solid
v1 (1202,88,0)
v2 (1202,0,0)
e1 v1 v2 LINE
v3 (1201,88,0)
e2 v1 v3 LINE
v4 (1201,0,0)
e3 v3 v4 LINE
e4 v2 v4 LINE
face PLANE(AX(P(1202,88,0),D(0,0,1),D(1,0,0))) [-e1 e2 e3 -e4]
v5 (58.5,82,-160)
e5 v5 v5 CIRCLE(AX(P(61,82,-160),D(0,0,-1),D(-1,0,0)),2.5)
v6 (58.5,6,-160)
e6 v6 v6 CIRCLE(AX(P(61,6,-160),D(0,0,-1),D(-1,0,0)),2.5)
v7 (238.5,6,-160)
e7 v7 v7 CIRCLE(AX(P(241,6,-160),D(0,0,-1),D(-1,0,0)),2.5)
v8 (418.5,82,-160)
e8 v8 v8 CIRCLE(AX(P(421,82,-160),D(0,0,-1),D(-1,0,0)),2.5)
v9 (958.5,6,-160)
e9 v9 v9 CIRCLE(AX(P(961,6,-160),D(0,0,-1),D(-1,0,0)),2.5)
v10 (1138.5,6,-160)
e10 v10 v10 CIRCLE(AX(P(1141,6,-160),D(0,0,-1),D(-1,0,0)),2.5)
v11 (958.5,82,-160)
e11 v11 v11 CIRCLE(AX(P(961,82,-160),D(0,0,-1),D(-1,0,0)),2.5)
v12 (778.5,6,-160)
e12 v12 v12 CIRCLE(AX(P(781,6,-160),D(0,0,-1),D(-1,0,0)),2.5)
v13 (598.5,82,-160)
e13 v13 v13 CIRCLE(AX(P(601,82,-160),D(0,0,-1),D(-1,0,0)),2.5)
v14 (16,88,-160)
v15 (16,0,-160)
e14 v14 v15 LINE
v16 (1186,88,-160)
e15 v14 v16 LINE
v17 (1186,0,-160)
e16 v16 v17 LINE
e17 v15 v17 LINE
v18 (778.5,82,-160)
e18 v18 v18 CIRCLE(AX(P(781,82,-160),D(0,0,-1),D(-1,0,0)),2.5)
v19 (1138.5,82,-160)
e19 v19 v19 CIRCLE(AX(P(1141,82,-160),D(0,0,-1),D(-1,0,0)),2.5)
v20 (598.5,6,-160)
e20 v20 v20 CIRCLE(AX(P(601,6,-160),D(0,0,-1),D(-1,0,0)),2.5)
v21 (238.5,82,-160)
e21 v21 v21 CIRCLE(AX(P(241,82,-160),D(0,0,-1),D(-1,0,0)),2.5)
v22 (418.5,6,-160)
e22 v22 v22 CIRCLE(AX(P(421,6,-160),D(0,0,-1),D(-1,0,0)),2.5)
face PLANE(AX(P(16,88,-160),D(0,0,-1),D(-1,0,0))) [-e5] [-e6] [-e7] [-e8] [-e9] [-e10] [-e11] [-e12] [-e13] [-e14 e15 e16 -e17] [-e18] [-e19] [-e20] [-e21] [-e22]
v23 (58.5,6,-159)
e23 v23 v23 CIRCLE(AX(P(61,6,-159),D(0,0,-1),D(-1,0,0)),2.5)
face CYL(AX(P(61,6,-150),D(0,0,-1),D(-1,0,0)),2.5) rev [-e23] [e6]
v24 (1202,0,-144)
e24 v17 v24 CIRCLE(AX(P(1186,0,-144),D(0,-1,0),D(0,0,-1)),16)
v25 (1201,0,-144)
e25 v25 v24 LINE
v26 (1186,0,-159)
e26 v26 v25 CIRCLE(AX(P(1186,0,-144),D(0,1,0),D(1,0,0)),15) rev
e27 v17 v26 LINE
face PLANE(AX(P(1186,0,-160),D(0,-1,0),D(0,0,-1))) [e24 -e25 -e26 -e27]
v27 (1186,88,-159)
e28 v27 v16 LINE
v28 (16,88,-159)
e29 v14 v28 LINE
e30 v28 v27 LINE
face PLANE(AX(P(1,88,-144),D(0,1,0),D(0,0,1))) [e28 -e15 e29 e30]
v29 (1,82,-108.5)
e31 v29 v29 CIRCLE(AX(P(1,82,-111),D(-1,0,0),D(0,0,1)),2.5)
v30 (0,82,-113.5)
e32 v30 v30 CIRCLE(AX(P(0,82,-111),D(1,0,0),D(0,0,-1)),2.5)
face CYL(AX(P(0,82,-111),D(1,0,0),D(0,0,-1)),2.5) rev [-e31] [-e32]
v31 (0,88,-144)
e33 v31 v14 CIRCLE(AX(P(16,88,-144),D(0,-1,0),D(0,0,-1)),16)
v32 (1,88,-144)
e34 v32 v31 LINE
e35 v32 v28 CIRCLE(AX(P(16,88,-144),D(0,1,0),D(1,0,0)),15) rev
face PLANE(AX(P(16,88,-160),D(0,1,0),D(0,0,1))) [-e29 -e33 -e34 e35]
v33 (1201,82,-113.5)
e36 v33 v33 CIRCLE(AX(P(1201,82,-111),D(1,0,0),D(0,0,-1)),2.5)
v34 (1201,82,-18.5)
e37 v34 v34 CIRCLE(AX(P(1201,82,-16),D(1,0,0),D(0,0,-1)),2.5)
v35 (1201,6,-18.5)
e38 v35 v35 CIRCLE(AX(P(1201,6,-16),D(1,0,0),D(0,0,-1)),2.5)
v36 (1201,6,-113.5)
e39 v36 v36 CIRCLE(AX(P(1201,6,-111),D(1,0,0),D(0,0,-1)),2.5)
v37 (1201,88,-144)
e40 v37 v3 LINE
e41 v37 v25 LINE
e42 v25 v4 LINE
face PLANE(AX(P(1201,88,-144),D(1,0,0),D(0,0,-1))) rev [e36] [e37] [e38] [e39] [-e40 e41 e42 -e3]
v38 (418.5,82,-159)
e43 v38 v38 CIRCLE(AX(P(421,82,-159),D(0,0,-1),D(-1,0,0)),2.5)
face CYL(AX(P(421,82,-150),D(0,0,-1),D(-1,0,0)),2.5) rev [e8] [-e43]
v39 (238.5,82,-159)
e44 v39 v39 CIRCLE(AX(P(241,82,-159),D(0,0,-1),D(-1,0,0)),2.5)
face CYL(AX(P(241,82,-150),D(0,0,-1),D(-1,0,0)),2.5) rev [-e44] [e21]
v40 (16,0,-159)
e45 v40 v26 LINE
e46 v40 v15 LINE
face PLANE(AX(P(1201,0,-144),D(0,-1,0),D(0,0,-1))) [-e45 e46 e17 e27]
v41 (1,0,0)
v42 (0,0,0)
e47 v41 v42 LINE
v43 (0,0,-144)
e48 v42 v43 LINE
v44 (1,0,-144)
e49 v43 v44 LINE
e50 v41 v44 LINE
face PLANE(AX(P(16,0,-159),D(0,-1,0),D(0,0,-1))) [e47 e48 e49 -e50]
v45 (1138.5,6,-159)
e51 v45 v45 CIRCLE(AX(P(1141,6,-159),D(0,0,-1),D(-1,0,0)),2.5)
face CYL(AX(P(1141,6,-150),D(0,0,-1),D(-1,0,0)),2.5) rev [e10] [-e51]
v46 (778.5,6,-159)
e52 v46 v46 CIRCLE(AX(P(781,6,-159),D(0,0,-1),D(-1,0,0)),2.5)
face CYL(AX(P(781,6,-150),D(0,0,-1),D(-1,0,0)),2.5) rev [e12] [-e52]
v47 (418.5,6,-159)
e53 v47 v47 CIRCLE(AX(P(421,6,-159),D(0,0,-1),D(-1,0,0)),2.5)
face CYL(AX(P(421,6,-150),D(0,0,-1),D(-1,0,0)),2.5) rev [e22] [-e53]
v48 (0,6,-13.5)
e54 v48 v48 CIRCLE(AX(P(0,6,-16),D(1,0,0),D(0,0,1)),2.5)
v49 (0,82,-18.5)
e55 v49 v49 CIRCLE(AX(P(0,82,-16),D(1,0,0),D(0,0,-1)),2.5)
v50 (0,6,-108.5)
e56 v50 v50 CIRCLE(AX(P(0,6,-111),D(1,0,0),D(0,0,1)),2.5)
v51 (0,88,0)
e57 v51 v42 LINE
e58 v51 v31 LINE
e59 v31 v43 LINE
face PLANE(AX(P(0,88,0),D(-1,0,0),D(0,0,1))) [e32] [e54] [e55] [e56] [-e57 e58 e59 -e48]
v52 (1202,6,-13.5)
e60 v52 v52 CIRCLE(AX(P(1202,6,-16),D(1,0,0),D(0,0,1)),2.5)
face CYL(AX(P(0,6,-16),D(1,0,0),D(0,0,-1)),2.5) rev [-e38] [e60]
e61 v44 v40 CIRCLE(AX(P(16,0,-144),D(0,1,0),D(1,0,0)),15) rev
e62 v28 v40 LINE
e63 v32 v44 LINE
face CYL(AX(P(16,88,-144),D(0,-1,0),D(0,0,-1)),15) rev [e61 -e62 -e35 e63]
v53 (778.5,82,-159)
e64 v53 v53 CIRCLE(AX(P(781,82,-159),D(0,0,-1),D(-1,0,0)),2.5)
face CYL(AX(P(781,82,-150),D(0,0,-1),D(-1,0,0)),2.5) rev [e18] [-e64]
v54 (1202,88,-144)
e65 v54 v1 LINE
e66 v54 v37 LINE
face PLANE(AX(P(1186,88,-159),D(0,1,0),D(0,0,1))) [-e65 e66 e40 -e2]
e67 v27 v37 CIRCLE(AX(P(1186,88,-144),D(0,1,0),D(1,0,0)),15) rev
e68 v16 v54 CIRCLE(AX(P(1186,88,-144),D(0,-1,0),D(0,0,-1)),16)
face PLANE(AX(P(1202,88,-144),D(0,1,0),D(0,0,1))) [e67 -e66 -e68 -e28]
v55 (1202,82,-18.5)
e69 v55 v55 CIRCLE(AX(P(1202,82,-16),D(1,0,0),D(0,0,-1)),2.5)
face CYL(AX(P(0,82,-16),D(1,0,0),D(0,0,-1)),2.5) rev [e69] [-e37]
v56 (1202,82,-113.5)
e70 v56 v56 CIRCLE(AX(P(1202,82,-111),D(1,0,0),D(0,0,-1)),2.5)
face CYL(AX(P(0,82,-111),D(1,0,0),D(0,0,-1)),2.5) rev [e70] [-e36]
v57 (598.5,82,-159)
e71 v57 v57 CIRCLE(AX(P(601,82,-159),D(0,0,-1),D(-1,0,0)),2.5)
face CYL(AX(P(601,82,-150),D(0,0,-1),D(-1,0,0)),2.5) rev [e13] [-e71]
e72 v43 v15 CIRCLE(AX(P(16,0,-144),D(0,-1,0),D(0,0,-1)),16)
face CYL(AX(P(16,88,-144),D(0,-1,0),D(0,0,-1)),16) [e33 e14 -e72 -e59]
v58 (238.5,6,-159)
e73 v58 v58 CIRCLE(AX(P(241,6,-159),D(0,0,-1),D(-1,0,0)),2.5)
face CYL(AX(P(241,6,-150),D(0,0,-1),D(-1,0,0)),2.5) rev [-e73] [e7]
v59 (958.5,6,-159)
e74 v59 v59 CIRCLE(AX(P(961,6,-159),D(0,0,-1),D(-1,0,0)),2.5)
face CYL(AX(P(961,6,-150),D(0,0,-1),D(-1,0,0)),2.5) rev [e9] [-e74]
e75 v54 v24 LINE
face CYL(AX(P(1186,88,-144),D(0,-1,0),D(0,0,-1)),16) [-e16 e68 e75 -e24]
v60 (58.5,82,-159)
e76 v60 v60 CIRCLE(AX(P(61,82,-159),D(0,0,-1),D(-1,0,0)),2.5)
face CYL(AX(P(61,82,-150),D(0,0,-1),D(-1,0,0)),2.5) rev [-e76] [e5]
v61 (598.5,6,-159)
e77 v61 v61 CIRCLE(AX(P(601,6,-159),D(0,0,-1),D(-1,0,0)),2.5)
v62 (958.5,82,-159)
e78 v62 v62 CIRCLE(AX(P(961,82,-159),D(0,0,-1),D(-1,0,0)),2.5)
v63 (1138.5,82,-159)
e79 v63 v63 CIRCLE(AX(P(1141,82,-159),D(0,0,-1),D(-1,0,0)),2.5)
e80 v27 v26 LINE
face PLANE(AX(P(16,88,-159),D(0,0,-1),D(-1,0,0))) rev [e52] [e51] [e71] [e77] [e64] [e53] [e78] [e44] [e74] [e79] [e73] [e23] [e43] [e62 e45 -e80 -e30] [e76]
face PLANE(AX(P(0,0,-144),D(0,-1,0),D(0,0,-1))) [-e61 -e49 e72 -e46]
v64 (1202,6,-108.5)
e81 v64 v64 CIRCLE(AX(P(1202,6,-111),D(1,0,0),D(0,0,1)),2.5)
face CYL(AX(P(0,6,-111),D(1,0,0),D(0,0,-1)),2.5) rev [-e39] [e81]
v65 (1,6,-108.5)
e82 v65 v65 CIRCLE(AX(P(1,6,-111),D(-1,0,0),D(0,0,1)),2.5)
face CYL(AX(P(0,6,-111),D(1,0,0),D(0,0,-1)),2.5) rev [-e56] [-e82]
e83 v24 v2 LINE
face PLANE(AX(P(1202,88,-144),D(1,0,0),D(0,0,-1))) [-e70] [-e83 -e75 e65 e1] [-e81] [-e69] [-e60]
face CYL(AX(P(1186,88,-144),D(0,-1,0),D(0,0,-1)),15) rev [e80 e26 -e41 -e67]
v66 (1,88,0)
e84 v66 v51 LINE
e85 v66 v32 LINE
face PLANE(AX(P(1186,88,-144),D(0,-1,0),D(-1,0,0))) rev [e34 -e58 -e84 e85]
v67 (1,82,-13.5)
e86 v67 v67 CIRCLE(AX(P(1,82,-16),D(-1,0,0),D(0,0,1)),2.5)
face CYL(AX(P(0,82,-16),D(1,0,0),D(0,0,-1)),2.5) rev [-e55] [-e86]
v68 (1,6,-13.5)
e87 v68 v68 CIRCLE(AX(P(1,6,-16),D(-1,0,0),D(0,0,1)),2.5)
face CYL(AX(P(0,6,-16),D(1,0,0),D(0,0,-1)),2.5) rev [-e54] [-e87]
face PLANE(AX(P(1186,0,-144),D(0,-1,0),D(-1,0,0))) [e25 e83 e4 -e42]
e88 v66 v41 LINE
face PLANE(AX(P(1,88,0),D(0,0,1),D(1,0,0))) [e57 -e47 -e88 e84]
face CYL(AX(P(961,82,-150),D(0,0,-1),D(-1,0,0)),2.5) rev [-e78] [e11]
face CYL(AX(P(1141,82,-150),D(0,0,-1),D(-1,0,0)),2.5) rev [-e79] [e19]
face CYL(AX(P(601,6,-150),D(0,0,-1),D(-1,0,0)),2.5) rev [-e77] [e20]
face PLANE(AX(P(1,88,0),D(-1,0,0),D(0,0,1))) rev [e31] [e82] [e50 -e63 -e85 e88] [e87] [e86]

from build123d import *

# Parameters (mm, degrees)
BASE_FLANGE1_DEPTH = 88
SKETCH2_R          = 2.5
CUT_EXTRUDE1_DEPTH = 1216.791100477
SKETCH3_R          = 2.5
CUT_EXTRUDE2_DEPTH = 10


# Read off the part's stored shape, not the designer's step: Base-Flange1
with BuildPart() as part:
    # Base-Flange1 outline → Base-Flange1 (new body)
    with BuildSketch(Plane(origin=(0, 0, 0), x_dir=(1, 0, 0), z_dir=(0, 1, 0))):
        with BuildLine():
            Line((1201, 144), (1201, 0))
            Line((1201, 0), (1202, 0))
            Line((1202, 0), (1202, 144))
            ThreePointArc((1202, 144), (1197.313708499, 155.313708499), (1186, 160))
            Line((1186, 160), (16, 160))
            ThreePointArc((16, 160), (4.686291501, 155.313708499), (0, 144))
            Line((0, 144), (0, 0))
            Line((0, 0), (1, 0))
            Line((1, 0), (1, 144))
            ThreePointArc((1, 144), (5.393398282, 154.606601718), (16, 159))
            Line((16, 159), (1186, 159))
            ThreePointArc((1186, 159), (1196.606601718, 154.606601718), (1201, 144))
        make_face()
    extrude(amount=BASE_FLANGE1_DEPTH)

    # Sketch2 → Cut-Extrude1 (cut, through all)
    with BuildSketch(Plane(origin=(1202, 0, 0), x_dir=(0, 0, -1), z_dir=(1, 0, 0))):
        with Locations((16, 82)):
            Circle(SKETCH2_R)
        with Locations((111, 82)):
            Circle(SKETCH2_R)
        with Locations(Location((111, 6, 0), (0, 0, 180))):
            Circle(SKETCH2_R)
        with Locations(Location((16, 6, 0), (0, 0, 180))):
            Circle(SKETCH2_R)
    extrude(amount=-CUT_EXTRUDE1_DEPTH, mode=Mode.SUBTRACT)

    # Sketch3 → Cut-Extrude2 (cut)
    with BuildSketch(Plane(origin=(0, 0, -160), x_dir=(-1, 0, 0), z_dir=(0, 0, -1))):
        with Locations((-1141, 82)):
            Circle(SKETCH3_R)
        with Locations((-961, 82)):
            Circle(SKETCH3_R)
        with Locations((-781, 82)):
            Circle(SKETCH3_R)
        with Locations((-601, 82)):
            Circle(SKETCH3_R)
        with Locations((-421, 82)):
            Circle(SKETCH3_R)
        with Locations((-241, 82)):
            Circle(SKETCH3_R)
        with Locations((-61, 82)):
            Circle(SKETCH3_R)
        with Locations((-961, 6)):
            Circle(SKETCH3_R)
        with Locations((-781, 6)):
            Circle(SKETCH3_R)
        with Locations((-601, 6)):
            Circle(SKETCH3_R)
        with Locations((-421, 6)):
            Circle(SKETCH3_R)
        with Locations((-241, 6)):
            Circle(SKETCH3_R)
        with Locations((-61, 6)):
            Circle(SKETCH3_R)
        with Locations((-1141, 6)):
            Circle(SKETCH3_R)
    extrude(amount=-CUT_EXTRUDE2_DEPTH, mode=Mode.SUBTRACT)


solid = part.part
